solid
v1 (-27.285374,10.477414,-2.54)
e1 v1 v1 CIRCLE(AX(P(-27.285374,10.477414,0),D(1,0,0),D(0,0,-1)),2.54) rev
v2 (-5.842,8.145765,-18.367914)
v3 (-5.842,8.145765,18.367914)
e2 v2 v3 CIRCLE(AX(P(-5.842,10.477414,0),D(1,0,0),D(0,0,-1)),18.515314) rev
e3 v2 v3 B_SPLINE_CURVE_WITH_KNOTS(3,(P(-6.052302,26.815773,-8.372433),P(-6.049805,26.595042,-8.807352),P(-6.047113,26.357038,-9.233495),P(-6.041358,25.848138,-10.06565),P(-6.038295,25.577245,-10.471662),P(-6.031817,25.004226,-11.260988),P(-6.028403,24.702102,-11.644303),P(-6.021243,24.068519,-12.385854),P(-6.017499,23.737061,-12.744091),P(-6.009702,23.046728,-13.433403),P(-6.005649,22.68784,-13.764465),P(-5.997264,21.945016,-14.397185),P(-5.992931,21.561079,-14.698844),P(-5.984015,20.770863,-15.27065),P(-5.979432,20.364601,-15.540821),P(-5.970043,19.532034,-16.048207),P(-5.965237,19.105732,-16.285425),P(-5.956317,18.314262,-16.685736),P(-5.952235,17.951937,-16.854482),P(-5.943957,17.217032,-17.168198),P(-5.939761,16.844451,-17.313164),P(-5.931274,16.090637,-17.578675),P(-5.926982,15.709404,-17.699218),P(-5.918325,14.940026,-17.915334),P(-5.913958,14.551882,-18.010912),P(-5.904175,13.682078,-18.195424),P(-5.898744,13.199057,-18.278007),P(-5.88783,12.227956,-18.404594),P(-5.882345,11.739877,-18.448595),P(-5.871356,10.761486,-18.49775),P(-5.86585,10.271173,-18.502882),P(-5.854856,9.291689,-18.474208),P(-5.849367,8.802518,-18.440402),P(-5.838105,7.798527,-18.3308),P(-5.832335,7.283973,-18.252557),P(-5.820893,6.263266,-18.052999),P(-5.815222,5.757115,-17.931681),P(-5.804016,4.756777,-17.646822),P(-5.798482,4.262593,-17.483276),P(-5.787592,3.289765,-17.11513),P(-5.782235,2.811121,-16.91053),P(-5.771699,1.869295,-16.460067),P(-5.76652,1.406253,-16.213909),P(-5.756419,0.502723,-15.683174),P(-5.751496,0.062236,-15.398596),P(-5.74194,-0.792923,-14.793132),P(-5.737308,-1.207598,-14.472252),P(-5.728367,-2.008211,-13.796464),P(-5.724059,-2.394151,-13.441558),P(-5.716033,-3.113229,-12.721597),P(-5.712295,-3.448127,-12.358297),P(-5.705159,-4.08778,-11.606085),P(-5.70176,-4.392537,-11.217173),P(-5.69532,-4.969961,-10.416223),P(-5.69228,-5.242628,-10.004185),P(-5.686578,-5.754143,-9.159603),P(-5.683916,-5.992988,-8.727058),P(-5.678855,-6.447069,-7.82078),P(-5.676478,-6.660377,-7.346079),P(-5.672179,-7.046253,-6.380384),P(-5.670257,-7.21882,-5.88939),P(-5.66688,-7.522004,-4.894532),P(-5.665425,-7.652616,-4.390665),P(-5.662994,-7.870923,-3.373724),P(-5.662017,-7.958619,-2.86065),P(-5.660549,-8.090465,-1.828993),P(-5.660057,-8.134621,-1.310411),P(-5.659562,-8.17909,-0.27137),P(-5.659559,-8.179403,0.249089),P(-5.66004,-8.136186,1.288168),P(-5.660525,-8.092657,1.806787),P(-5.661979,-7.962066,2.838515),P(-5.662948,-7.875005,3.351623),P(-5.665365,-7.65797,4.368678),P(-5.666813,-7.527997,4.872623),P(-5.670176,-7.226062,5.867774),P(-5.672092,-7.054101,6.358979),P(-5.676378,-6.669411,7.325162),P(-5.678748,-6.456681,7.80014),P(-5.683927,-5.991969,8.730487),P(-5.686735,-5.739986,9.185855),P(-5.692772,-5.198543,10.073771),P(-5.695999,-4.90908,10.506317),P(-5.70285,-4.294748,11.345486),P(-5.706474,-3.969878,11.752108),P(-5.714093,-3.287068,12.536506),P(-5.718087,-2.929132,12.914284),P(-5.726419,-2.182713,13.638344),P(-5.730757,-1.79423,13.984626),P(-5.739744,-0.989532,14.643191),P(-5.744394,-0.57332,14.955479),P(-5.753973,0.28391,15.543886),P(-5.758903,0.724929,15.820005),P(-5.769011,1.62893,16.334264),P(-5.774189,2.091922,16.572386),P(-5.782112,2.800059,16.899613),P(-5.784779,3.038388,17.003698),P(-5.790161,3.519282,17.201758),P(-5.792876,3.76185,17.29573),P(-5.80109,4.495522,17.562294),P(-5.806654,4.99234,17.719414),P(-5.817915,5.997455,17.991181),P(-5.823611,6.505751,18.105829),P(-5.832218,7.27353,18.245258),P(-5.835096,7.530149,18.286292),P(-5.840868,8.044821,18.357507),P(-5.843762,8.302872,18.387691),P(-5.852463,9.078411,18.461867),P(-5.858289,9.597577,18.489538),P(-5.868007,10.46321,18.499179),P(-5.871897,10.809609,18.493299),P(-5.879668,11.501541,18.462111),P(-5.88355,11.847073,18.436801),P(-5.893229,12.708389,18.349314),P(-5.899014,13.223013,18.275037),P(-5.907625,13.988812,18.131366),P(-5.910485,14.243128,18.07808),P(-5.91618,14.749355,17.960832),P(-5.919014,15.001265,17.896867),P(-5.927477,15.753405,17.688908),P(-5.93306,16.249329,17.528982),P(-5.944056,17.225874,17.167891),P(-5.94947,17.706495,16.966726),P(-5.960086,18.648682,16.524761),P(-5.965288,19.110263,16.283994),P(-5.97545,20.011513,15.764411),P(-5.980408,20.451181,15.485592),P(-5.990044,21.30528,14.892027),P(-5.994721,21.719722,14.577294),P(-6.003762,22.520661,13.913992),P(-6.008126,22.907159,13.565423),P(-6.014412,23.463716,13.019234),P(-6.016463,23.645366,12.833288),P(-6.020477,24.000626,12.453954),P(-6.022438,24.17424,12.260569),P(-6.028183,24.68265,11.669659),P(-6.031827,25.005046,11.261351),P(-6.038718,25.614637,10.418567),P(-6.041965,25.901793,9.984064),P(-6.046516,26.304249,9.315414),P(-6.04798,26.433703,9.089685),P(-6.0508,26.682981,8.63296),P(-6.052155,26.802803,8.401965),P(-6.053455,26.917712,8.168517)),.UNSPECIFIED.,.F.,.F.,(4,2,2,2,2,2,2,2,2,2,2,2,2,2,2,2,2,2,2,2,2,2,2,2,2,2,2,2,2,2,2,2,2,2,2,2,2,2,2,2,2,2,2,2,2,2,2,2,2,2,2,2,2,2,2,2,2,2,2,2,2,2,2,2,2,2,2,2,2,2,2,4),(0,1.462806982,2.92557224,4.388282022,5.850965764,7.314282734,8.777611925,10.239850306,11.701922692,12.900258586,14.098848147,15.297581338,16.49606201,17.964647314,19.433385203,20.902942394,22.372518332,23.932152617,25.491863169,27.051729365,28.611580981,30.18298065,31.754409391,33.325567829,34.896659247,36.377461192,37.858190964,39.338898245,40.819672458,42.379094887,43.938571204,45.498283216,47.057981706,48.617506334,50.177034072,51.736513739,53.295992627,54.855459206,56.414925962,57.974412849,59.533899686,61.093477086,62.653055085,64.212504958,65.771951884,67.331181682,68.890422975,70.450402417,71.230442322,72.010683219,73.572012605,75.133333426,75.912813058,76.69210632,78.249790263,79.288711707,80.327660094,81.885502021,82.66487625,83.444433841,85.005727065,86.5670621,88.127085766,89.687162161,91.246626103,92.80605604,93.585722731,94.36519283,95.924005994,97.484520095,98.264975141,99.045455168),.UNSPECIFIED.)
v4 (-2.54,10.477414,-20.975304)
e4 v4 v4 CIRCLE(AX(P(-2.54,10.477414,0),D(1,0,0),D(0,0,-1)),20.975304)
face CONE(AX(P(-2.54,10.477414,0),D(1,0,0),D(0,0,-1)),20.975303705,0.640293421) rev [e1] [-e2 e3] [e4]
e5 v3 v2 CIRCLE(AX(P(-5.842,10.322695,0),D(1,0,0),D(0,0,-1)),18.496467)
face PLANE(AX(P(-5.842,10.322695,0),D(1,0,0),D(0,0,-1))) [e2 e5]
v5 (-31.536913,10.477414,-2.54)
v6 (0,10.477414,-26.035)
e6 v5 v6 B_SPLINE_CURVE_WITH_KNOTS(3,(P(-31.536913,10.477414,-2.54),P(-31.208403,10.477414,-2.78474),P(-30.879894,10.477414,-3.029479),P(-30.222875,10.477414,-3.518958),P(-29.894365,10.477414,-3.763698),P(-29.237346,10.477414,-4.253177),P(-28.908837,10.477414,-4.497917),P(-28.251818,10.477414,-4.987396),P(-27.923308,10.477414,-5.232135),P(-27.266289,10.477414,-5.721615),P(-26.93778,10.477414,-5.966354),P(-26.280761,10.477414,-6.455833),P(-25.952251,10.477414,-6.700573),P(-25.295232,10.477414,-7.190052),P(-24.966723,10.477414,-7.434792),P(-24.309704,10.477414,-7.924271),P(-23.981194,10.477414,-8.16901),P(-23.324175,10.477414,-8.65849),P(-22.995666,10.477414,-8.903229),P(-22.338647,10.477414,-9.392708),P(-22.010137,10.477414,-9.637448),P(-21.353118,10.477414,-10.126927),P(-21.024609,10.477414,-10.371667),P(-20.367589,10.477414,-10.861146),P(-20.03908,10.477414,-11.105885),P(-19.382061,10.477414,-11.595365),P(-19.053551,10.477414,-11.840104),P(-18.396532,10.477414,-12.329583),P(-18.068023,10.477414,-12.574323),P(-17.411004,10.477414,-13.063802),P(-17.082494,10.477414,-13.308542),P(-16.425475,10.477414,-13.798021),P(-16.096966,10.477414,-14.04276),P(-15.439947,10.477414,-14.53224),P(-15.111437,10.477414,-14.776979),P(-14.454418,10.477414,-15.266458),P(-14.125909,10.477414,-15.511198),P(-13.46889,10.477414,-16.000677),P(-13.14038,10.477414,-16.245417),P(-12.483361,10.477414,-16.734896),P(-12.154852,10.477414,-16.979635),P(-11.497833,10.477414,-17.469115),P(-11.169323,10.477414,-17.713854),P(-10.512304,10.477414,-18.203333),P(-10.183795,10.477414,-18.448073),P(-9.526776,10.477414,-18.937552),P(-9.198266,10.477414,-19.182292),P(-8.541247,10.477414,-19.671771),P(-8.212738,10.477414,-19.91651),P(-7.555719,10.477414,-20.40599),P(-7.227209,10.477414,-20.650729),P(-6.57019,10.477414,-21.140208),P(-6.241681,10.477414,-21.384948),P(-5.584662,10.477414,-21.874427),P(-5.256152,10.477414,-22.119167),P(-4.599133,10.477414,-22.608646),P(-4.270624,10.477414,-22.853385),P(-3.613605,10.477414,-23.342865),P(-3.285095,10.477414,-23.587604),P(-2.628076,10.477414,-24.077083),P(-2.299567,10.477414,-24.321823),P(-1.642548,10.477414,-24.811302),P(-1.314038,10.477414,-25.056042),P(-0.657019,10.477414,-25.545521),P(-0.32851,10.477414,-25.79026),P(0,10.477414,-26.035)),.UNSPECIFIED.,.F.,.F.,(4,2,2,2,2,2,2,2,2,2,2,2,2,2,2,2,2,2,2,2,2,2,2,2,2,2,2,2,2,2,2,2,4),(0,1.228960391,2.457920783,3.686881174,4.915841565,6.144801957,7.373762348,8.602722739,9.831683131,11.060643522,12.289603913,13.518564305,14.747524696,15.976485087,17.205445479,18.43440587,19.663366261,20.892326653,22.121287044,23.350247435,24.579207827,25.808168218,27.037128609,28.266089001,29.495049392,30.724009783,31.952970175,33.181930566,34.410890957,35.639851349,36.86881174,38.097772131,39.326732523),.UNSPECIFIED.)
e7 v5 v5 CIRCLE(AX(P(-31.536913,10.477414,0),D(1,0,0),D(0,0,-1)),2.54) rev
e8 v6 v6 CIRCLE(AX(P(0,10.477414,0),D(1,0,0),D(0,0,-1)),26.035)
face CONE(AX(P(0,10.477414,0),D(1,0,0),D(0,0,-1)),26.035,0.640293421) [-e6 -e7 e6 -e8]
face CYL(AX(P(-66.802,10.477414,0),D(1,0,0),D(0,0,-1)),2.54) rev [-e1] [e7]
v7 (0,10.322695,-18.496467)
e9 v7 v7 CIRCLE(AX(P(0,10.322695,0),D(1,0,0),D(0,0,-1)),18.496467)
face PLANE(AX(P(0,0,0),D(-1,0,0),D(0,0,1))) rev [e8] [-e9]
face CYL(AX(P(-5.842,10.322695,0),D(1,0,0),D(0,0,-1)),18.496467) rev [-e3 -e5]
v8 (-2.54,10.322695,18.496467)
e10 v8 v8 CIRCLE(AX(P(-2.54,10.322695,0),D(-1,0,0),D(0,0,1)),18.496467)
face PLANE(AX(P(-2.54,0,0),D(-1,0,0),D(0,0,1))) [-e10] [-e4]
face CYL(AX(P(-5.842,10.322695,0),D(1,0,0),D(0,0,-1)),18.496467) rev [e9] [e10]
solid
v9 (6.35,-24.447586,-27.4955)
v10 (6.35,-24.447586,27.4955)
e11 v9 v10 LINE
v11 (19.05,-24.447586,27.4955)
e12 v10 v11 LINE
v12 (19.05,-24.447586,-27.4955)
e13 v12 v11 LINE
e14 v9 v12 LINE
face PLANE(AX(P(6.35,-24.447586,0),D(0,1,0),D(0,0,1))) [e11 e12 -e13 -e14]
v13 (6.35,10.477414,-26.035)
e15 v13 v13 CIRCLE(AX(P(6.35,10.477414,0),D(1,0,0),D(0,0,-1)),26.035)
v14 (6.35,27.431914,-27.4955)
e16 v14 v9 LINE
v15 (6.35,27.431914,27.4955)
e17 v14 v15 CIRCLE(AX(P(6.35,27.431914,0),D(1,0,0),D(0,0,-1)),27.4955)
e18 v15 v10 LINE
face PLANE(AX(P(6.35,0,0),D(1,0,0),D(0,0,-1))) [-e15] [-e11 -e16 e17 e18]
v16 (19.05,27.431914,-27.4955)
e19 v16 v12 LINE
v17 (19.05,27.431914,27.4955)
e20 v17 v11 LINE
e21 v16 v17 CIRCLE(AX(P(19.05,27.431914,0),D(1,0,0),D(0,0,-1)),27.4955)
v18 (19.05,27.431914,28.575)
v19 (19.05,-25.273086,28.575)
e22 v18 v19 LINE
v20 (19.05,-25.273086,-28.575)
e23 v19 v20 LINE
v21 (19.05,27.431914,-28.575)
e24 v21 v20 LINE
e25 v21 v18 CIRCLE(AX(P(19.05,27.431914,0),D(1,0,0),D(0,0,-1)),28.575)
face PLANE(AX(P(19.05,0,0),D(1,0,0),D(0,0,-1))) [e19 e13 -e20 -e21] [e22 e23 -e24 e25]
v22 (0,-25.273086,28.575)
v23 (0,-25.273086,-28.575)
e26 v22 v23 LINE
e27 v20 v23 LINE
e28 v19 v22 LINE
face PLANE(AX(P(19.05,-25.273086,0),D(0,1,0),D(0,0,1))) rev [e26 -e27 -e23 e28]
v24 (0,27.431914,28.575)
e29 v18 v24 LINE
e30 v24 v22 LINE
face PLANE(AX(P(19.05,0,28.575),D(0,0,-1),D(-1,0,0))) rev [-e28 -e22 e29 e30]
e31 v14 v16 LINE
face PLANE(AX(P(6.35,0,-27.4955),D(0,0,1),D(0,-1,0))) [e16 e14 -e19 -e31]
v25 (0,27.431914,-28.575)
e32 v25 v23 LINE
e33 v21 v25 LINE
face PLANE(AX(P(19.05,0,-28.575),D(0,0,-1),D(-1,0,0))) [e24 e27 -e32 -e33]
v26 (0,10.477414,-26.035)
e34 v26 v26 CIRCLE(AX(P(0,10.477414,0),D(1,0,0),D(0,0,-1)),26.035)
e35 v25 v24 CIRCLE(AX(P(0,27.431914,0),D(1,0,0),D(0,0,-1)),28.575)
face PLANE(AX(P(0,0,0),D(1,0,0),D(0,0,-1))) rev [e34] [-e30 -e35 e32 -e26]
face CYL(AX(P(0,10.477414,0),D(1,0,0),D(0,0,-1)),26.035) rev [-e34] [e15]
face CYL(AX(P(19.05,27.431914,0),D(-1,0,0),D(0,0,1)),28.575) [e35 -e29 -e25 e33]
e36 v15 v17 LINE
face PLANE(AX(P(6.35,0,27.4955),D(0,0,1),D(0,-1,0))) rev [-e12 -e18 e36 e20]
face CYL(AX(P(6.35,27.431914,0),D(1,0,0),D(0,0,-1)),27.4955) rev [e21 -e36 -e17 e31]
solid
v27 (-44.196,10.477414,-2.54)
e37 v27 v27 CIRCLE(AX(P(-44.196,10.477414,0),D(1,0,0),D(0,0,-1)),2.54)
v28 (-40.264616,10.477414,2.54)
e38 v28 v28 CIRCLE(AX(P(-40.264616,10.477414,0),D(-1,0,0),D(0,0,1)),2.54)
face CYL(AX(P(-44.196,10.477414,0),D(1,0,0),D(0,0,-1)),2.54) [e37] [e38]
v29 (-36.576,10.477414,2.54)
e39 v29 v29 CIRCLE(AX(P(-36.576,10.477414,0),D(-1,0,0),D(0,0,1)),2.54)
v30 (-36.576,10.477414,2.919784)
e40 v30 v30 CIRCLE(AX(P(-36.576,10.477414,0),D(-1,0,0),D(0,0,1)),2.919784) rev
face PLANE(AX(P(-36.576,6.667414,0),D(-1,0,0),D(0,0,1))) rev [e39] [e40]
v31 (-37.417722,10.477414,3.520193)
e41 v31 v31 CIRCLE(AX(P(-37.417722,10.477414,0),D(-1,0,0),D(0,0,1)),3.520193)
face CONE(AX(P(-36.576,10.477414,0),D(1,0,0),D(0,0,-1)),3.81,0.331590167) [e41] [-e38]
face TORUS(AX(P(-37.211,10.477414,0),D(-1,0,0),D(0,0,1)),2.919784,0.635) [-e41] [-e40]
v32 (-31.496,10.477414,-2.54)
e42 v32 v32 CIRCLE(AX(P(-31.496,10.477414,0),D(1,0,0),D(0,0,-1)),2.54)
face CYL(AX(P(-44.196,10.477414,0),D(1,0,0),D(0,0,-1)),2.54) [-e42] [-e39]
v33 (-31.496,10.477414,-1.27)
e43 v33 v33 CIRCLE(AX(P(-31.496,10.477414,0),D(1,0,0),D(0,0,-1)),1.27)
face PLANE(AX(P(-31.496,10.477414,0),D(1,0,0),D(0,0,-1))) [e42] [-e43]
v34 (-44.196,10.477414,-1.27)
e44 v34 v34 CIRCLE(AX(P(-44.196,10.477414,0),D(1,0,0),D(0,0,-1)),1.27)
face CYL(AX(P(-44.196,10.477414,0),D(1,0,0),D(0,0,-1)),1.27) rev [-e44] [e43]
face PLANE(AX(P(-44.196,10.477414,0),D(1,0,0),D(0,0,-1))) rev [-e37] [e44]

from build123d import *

# Parameters (mm, degrees)
BOSS_EXTRUDE1_DEPTH = 19.05
CUT_EXTRUDE1_DEPTH  = 12.7
SKETCH4_R           = 26.035
CUT_EXTRUDE2_DEPTH  = 65.145109252
SKETCH7_R           = 18.496466633
CUT_EXTRUDE3_DEPTH  = 5.842
SKETCH8_R           = 2.54
CUT_EXTRUDE4_DEPTH  = 60.96
SKETCH9_R           = 2.54
SKETCH9_R_2         = 1.27
EXTRUDE_THIN1_DEPTH = 12.7
FILLET1_R           = 0.635


# Read off the part's stored shape, not the designer's step: Revolve-Thin4
with BuildPart() as part:
    # Sketch2 → Boss-Extrude1 (new body)
    with BuildSketch(Plane(origin=(0, 0, 0), x_dir=(0, 0, -1), z_dir=(1, 0, 0))):
        with BuildLine():
            Line((-28.575, 27.431914001), (-28.575, -25.273085999))
            Line((-28.575, -25.273085999), (28.575, -25.273085999))
            Line((28.575, -25.273085999), (28.575, 27.431914001))
            ThreePointArc((28.575, 27.431914001), (0, 56.006914001), (-28.575, 27.431914001))
        make_face()
    extrude(amount=BOSS_EXTRUDE1_DEPTH)

    # Sketch3 → Cut-Extrude1 (cut)
    with BuildSketch(Plane(origin=(19.05, 0, 0), x_dir=(0, 0, -1), z_dir=(1, 0, 0))):
        with BuildLine():
            Line((27.4955, 27.431914001), (27.4955, -24.447585999))
            Line((27.4955, -24.447585999), (-27.4955, -24.447585999))
            Line((-27.4955, -24.447585999), (-27.4955, 27.431914001))
            ThreePointArc((-27.4955, 27.431914001), (0, 54.927414001), (27.4955, 27.431914001))
        make_face()
    extrude(amount=-CUT_EXTRUDE1_DEPTH, mode=Mode.SUBTRACT)

    # Sketch4 → Cut-Extrude2 (cut, through all)
    with BuildSketch(Plane(origin=(6.35, 0, 0), x_dir=(0, 0, -1), z_dir=(1, 0, 0))):
        with Locations((0, 10.477414001)):
            Circle(SKETCH4_R)
    extrude(amount=-CUT_EXTRUDE2_DEPTH, mode=Mode.SUBTRACT)


with BuildPart() as body_2:
    # Revolve-Thin4 outline → Revolve-Thin4 (revolve)
    with BuildSketch(Plane(origin=(0, 10.477414001, 0), x_dir=(0, 1, 0), z_dir=(0, 0, -1))):
        Polygon((0, 0), (0, -31.75), (2.38125, -31.75), (26.035, 0), align=None)
        Polygon((2.54, -27.285374101), (2.54, -2.54), (20.975303705, -2.54), align=None, mode=Mode.SUBTRACT)
    revolve(axis=Axis((0, 10.477414001, 0), (1, 0, 0)))

    # Sketch7 → Cut-Extrude3 (cut)
    with BuildSketch(Plane(origin=(0, 0, 0), x_dir=(0, 0, -1), z_dir=(1, 0, 0))):
        with Locations((0, 10.322694798)):
            Circle(SKETCH7_R)
    extrude(amount=-CUT_EXTRUDE3_DEPTH, mode=Mode.SUBTRACT)

    # Sketch8 → Cut-Extrude4 (cut)
    with BuildSketch(Plane(origin=(-5.842, 0, 0), x_dir=(0, 0, -1), z_dir=(1, 0, 0))):
        with Locations((0, 10.477414001)):
            Circle(SKETCH8_R)
    extrude(amount=-CUT_EXTRUDE4_DEPTH, mode=Mode.SUBTRACT)


with BuildPart() as body_3:
    # Sketch9 → Extrude-Thin1 (new body)
    with BuildSketch(Plane(origin=(-31.496, 0, 0), x_dir=(0, 0, -1), z_dir=(1, 0, 0))):
        with Locations((0, 10.477414001)):
            Circle(SKETCH9_R)
        with Locations((0, 10.477414001)):
            Circle(SKETCH9_R_2, mode=Mode.SUBTRACT)
    extrude(amount=-EXTRUDE_THIN1_DEPTH)

    # Sketch10 → Revolve1 (revolve)
    with BuildSketch(Plane(origin=(0, 0, 0), x_dir=(-1, 0, 0), z_dir=(0, 0, -1)), mode=Mode.PRIVATE) as revolve1_sk:
        Polygon((40.264616111, 7.937414001), (36.576, 6.667414001), (36.576, 7.937414001), align=None)
    revolve(revolve1_sk.sketch.rotate(Axis((0, 10.477414001, 0), (1, 0, 0)), 90), axis=Axis((0, 10.477414001, 0), (1, 0, 0)))

    # Fillet1
    fillet1_edges = [body_3.edges().sort_by_distance(p)[0] for p in [
        (-36.576, 10.477414001, 3.81),
    ]]
    fillet(fillet1_edges, radius=FILLET1_R)


solid = Compound([part.part, body_2.part, body_3.part])
